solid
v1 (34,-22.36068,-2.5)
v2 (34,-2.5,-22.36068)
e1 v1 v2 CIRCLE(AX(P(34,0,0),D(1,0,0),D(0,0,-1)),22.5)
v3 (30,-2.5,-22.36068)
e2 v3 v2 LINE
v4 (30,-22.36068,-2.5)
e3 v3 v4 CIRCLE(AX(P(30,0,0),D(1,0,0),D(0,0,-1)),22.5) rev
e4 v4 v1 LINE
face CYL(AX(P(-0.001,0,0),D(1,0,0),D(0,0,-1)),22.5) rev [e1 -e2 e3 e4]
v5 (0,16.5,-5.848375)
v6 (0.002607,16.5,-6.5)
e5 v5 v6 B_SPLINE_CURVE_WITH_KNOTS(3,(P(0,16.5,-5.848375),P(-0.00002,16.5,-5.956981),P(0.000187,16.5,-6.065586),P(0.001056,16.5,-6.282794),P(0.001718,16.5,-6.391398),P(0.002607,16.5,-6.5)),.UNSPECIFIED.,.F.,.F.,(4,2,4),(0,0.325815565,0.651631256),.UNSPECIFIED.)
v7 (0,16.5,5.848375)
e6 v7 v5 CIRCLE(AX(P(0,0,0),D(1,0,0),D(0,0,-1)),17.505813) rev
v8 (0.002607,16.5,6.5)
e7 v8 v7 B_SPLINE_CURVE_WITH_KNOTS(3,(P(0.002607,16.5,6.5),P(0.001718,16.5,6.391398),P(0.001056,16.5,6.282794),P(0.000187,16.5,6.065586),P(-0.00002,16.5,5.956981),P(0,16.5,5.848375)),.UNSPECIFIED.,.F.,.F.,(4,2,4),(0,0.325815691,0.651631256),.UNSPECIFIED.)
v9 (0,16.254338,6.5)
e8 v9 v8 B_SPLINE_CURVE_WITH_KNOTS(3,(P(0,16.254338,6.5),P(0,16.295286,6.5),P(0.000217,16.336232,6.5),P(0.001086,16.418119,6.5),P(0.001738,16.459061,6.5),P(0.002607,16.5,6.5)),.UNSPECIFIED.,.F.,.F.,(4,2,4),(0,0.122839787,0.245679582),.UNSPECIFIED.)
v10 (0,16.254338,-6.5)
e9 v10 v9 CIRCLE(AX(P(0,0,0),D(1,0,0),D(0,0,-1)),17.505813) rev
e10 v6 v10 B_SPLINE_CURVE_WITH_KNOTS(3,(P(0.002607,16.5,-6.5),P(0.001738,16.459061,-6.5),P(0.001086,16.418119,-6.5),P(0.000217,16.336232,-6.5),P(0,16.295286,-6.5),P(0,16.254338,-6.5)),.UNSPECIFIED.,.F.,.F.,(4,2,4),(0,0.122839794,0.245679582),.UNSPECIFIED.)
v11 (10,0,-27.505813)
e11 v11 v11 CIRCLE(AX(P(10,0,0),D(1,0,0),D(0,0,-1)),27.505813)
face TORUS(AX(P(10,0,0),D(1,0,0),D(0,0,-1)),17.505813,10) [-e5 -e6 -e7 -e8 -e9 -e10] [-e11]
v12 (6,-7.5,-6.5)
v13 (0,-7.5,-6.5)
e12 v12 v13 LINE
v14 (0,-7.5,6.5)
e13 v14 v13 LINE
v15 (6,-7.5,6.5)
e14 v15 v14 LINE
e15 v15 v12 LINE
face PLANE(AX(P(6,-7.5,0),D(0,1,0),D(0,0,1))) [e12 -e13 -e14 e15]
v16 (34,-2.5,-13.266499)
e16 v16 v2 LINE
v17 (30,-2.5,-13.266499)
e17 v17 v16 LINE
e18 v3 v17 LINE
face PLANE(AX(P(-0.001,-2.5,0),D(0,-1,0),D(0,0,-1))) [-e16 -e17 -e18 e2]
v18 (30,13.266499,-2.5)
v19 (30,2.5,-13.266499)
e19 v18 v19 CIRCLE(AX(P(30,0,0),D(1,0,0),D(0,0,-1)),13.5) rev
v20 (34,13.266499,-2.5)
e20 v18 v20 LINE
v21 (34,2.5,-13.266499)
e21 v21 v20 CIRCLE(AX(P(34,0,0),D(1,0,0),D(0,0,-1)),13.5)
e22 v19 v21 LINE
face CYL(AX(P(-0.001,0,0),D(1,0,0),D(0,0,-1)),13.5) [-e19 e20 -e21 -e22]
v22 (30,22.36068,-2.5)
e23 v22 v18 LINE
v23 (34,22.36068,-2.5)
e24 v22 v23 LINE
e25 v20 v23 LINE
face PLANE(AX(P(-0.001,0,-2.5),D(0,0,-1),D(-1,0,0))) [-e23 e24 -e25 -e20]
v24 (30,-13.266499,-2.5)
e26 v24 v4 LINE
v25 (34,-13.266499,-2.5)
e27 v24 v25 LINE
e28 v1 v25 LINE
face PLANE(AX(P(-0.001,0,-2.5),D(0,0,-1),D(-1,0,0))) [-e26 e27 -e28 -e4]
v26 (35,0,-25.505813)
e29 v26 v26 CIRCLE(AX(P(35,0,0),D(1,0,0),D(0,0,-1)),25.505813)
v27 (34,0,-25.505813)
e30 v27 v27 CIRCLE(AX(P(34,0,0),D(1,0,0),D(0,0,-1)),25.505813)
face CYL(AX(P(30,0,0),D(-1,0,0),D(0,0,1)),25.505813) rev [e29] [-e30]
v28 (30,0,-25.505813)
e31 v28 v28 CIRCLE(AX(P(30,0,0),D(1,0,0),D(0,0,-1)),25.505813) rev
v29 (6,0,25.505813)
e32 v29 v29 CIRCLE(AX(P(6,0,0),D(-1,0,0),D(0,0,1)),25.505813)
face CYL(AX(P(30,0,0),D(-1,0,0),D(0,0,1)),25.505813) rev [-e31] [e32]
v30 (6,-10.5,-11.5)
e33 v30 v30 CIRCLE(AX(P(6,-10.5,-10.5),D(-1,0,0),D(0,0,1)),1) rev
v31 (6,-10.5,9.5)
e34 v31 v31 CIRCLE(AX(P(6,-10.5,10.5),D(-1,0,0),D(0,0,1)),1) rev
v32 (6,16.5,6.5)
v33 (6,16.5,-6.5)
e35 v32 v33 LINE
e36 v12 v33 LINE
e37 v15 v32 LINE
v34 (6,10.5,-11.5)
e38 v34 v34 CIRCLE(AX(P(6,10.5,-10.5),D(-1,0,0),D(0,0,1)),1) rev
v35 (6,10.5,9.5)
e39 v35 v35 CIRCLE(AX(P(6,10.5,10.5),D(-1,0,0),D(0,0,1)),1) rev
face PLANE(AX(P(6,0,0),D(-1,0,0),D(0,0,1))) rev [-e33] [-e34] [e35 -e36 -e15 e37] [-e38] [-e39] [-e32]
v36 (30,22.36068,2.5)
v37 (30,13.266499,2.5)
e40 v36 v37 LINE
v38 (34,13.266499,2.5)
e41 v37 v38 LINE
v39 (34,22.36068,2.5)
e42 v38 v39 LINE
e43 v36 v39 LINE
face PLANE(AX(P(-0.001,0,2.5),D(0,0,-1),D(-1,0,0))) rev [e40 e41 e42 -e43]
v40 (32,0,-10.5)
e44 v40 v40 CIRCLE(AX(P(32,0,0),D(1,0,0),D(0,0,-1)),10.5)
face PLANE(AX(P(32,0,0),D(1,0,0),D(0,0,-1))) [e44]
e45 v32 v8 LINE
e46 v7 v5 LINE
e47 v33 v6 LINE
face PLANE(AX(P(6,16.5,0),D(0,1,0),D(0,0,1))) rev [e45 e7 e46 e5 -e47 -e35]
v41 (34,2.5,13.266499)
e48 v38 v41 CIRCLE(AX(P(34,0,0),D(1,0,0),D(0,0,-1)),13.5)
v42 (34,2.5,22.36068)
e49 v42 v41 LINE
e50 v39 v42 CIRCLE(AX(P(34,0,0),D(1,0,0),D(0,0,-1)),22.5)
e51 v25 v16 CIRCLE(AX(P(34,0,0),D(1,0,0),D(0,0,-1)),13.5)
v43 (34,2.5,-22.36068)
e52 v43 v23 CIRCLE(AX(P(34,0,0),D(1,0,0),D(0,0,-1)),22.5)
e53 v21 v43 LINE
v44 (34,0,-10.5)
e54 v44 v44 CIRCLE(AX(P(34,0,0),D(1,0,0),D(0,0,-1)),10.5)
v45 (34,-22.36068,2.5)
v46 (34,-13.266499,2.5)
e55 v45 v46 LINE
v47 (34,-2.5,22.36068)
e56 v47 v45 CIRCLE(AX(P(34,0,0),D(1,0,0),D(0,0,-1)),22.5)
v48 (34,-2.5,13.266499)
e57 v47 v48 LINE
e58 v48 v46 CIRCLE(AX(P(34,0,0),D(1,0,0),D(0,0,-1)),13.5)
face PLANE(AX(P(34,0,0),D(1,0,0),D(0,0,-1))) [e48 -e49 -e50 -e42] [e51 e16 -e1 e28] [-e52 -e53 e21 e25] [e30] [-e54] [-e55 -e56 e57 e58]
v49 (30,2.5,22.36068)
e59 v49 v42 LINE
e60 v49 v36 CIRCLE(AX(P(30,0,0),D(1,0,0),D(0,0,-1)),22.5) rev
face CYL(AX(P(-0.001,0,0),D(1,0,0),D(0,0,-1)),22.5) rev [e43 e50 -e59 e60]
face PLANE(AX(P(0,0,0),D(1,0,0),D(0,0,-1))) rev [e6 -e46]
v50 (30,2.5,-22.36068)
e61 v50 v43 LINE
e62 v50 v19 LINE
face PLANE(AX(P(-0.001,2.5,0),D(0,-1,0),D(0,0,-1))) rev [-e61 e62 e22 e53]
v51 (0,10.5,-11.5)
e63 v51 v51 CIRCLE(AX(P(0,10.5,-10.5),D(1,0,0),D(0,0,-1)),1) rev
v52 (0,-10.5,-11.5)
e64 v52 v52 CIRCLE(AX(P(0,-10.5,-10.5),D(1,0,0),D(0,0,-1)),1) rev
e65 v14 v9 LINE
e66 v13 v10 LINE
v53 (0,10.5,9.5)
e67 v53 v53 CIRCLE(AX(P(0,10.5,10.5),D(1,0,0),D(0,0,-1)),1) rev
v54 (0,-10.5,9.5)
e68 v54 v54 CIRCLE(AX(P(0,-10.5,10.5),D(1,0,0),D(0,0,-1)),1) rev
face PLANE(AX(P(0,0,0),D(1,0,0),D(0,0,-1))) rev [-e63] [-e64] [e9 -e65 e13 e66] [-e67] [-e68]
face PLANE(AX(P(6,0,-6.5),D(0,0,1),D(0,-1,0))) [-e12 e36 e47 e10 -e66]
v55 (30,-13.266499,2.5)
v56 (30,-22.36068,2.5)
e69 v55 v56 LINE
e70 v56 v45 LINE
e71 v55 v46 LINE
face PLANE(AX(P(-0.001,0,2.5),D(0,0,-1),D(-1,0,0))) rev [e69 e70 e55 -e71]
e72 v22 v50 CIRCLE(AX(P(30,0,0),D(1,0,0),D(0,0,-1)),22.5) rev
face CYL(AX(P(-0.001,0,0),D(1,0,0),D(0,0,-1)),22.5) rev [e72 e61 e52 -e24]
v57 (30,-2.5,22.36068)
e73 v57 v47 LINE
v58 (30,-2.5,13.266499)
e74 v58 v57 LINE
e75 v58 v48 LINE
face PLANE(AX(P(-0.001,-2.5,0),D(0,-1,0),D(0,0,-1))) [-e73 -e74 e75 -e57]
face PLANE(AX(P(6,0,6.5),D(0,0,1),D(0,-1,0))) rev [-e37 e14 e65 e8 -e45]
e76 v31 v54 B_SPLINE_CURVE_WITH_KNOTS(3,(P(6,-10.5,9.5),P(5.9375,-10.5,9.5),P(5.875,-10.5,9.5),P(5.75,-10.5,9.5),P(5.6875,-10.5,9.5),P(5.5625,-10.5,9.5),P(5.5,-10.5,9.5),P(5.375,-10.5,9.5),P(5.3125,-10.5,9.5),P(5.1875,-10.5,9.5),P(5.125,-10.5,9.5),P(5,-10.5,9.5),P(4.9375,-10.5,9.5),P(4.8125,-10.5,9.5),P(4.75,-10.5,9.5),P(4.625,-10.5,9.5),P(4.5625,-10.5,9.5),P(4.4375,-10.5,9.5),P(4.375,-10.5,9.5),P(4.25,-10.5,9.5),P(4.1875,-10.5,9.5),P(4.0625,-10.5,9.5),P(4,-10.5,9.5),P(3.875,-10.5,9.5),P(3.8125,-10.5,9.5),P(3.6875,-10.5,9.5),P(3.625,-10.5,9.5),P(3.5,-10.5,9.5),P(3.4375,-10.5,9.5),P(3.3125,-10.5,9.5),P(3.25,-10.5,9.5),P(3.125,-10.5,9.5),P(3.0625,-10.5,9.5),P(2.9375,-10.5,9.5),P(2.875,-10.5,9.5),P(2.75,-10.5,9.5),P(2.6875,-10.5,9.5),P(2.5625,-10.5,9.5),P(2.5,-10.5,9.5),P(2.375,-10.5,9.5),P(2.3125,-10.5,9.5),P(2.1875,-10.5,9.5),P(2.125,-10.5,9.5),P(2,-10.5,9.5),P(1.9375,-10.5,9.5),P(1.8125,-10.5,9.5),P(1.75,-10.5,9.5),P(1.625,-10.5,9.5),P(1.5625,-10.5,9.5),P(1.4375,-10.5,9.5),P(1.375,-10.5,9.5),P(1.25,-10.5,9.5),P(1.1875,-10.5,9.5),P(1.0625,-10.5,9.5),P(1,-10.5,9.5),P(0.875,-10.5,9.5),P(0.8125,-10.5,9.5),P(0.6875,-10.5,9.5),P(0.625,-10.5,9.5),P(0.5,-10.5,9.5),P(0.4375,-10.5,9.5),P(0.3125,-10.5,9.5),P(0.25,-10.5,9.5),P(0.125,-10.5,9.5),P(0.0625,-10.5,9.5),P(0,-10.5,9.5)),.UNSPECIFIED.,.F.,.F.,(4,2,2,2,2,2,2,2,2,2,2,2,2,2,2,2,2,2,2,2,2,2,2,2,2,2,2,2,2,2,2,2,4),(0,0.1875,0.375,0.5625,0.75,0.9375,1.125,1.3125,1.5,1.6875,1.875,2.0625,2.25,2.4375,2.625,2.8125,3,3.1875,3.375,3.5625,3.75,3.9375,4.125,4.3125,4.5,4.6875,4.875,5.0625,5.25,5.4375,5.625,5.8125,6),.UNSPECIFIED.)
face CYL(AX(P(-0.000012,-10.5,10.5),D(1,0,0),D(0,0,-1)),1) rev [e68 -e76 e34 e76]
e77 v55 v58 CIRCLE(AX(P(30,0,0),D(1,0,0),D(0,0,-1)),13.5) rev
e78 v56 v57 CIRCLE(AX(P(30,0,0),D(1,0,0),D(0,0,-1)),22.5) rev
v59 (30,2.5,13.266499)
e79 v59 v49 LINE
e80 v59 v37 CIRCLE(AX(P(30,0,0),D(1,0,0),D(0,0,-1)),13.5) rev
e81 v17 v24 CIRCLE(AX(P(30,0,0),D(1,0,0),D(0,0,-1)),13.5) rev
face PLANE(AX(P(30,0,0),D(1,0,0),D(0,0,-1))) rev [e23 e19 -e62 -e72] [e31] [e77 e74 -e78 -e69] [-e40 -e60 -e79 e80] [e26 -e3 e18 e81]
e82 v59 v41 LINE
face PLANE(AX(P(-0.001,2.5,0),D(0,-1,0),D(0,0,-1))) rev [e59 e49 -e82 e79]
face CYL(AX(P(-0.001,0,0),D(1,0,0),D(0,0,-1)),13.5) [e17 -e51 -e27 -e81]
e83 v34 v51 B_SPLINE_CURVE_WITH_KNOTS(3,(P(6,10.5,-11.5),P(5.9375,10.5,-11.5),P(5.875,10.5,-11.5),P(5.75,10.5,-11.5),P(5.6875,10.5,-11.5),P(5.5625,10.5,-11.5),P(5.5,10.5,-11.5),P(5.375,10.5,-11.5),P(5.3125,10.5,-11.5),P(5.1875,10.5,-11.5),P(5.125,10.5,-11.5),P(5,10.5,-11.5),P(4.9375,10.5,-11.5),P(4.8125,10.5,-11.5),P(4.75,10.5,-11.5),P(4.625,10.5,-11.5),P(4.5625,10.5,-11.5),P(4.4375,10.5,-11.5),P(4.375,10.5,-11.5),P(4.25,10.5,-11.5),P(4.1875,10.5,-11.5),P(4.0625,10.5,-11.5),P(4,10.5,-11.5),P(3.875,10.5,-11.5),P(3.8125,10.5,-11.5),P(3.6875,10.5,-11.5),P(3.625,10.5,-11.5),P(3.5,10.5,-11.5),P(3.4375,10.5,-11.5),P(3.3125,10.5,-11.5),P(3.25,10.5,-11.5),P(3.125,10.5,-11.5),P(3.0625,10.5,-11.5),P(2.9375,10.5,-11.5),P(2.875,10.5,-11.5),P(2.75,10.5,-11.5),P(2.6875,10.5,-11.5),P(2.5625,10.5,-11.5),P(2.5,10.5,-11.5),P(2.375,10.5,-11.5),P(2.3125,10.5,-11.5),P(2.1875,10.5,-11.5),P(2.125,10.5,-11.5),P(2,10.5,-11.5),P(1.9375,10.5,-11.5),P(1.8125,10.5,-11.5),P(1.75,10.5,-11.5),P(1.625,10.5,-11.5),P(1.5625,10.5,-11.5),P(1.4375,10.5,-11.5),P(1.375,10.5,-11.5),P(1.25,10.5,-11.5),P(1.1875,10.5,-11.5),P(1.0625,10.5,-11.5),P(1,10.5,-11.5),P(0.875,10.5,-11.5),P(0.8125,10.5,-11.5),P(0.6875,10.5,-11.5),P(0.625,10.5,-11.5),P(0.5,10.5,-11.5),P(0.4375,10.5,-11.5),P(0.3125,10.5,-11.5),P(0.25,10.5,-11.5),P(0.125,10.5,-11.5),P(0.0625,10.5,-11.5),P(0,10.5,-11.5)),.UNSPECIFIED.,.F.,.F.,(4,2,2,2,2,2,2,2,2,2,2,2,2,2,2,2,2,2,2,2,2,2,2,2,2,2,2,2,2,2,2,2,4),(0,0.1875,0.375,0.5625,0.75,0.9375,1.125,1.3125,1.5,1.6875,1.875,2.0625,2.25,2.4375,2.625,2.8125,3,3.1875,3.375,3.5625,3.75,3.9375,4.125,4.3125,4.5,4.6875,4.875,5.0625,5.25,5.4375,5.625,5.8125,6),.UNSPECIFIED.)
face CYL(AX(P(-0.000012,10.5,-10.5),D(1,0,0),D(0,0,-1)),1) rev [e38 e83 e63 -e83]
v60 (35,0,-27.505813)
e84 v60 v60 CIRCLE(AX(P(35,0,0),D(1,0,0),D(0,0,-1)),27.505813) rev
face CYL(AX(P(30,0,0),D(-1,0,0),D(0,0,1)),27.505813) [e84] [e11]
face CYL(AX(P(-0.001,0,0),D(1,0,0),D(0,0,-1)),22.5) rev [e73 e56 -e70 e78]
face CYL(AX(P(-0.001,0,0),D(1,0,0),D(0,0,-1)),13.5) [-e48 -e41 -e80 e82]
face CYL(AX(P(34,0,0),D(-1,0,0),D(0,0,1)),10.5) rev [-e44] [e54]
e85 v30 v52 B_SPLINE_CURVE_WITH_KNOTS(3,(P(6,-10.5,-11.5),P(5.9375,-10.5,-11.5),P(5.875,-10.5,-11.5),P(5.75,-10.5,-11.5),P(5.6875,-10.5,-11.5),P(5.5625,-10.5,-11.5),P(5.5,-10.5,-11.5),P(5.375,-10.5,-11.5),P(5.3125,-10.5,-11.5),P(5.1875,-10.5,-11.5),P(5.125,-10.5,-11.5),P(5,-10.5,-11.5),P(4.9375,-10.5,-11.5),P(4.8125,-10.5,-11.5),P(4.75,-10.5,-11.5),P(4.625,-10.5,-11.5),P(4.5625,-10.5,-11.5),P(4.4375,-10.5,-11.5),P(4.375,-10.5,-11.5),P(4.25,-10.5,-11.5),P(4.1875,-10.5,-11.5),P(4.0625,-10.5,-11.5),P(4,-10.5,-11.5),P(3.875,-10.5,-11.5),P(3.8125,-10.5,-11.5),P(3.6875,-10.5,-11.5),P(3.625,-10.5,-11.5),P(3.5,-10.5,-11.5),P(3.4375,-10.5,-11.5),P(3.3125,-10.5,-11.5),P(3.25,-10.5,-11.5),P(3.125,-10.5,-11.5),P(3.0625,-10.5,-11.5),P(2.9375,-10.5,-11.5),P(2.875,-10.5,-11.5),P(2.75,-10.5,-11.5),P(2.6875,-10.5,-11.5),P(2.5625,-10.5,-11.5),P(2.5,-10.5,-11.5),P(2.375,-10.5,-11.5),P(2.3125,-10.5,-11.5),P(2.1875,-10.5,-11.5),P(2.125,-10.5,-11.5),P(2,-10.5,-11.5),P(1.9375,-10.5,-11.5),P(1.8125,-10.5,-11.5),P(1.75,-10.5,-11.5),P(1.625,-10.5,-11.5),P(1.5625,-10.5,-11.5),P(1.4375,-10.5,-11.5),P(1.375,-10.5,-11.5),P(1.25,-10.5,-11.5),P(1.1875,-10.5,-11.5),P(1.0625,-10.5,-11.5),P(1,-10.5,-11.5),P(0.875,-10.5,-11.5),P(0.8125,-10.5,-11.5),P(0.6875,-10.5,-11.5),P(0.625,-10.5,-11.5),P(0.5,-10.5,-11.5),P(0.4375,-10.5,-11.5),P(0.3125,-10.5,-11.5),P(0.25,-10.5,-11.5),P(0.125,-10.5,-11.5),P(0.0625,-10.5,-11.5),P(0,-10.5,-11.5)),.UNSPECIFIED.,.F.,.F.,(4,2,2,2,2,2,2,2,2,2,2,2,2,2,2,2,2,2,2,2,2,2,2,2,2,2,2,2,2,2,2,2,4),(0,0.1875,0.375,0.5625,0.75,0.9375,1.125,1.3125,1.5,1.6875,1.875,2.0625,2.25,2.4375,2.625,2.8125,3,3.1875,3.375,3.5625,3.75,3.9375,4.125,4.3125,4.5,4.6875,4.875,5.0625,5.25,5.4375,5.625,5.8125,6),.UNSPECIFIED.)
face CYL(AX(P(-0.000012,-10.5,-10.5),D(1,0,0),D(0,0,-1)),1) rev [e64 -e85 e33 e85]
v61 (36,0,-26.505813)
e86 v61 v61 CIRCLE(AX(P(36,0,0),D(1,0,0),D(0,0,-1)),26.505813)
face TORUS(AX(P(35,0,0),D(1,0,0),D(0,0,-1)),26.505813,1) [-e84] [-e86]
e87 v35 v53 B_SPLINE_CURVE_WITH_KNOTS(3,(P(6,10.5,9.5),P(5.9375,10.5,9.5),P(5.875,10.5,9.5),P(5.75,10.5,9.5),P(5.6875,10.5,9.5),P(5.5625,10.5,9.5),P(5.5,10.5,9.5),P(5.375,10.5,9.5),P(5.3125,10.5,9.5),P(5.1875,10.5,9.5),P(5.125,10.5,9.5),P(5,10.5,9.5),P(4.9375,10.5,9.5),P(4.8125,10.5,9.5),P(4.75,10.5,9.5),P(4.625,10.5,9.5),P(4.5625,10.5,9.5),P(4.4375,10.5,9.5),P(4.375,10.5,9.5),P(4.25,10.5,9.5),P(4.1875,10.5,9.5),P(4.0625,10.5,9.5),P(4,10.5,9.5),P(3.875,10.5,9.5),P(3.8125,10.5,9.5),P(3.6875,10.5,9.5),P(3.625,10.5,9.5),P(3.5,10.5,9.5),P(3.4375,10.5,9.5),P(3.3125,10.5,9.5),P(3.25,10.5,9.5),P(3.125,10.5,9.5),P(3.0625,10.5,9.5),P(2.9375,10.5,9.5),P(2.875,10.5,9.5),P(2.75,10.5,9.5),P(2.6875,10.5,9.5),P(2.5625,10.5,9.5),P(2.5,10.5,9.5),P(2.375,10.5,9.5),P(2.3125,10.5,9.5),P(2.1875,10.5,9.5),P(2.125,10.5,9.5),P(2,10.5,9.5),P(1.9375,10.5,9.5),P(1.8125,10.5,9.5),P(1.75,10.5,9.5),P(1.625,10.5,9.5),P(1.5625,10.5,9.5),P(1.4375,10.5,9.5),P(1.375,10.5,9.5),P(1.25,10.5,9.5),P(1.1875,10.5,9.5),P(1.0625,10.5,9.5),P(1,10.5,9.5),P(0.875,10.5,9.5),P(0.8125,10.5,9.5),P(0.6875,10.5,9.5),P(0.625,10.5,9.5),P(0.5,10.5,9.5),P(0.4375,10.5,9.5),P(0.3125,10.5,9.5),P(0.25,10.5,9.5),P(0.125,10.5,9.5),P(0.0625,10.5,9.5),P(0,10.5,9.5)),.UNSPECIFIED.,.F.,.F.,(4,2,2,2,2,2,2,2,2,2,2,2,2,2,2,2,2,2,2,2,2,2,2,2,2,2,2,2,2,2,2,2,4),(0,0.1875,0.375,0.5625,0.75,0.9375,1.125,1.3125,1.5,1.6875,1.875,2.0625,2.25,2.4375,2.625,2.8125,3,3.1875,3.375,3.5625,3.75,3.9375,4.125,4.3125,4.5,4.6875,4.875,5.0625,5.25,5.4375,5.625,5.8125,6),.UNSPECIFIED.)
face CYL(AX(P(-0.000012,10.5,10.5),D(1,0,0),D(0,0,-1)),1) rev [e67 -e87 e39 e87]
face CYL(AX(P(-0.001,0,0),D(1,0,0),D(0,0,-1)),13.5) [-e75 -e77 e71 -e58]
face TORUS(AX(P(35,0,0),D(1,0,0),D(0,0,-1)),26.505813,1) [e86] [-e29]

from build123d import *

# Parameters (mm, degrees)
SKETCH1_R                      = 27.505813168
SKETCH1_R_2                    = 25.505813168
BOSS_EXTRUDE1_DEPTH            = 30
SKETCH2_R                      = 27.505813168
SKETCH2_R_2                    = 25.505813168
BOSS_EXTRUDE4_DEPTH            = 6
SKETCH2_4_R                    = 25.505813168
SKETCH2_4_R_2                  = 10.5
BOSS_EXTRUDE5_DEPTH            = 4
SKETCH2_5_R                    = 10.5
BOSS_EXTRUDE6_DEPTH            = 2
SKETCH3_R                      = 27.505813168
SKETCH3_R_2                    = 25.505813168
SKETCH3_R_3                    = 21.505813168
SKETCH3_W                      = 4
SKETCH3_H                      = 13
BOSS_EXTRUDE8_DEPTH            = 6
CUT_EXTRUDE3_REACH             = 53.664
CUT_EXTRUDE4_REACH             = 55.001
SKETCH9_R                      = 1
CUT_EXTRUDE4_DIRECTION_2_DEPTH = 54.001316173
FILLET9_R                      = 10
FILLET10_R                     = 1


# Some blends are built 0.0001 mm under size
with BuildPart() as part:
    # Sketch1 → Boss-Extrude1 (new body)
    with BuildSketch(Plane.YZ):
        with Locations(Location((0, 0, 0), (0, 0, 270))):
            Circle(SKETCH1_R)
        with Locations(Location((0, 0, 0), (0, 0, 270))):
            Circle(SKETCH1_R_2, mode=Mode.SUBTRACT)
    extrude(amount=BOSS_EXTRUDE1_DEPTH)

    # Sketch2 → Boss-Extrude4 (add)
    with BuildSketch(Plane.YZ.offset(30)):
        with Locations(Location((0, 0, 0), (0, 0, 270))):
            Circle(SKETCH2_R)
        with Locations(Location((0, 0, 0), (0, 0, 270))):
            Circle(SKETCH2_R_2, mode=Mode.SUBTRACT)
    extrude(amount=BOSS_EXTRUDE4_DEPTH)

    # Sketch2<4> → Boss-Extrude5 (add)
    with BuildSketch(Plane.YZ.offset(30)):
        with Locations(Location((0, 0, 0), (0, 0, 270))):
            Circle(SKETCH2_4_R)
        with Locations(Location((0, 0, 0), (0, 0, 270))):
            Circle(SKETCH2_4_R_2, mode=Mode.SUBTRACT)
    extrude(amount=BOSS_EXTRUDE5_DEPTH)

    # Sketch2<5> → Boss-Extrude6 (add)
    with BuildSketch(Plane.YZ.offset(30)):
        with Locations(Location((0, 0, 0), (0, 0, 270))):
            Circle(SKETCH2_5_R)
    extrude(amount=BOSS_EXTRUDE6_DEPTH)

    # Sketch3 → Boss-Extrude8 (add)
    # profile 1 of 6: a face of its own
    with BuildSketch(Plane(origin=(0, 0, 0), x_dir=(0, -1, 0), z_dir=(-1, 0, 0))):
        with Locations(Location((0, 0, 0), (0, 0, 270))):
            Circle(SKETCH3_R)
        with Locations(Location((0, 0, 0), (0, 0, 270))):
            Circle(SKETCH3_R_2, mode=Mode.SUBTRACT)
    # profile 2 of 6: a face of its own
    with BuildSketch(Plane(origin=(0, 0, 0), x_dir=(0, -1, 0), z_dir=(-1, 0, 0))):
        with Locations(Location((0, 0, 0), (0, 0, 270))):
            Circle(SKETCH3_R_2)
        Circle(SKETCH3_R_3, mode=Mode.SUBTRACT)
    # profile 3 of 6: a face of its own
    with BuildSketch(Plane(origin=(0, 0, 0), x_dir=(0, -1, 0), z_dir=(-1, 0, 0))):
        with BuildLine():
            ThreePointArc((12.5, 0), (3.375390485, 12.035644523), (-10.677078252, 6.5))
            Line((-10.677078252, 6.5), (0, 6.5))
            Line((0, 6.5), (7.5, 6.5))
            Line((7.5, 6.5), (7.5, -6.5))
            Line((7.5, -6.5), (0, -6.5))
            Line((0, -6.5), (-10.677078252, -6.5))
            ThreePointArc((-10.677078252, -6.5), (3.375390485, -12.035644523), (12.5, 0))
        make_face()
    # profile 4 of 6: a face of its own
    with BuildSketch(Plane(origin=(0, 0, 0), x_dir=(0, -1, 0), z_dir=(-1, 0, 0))):
        with BuildLine():
            Line((-20.5, -6.5), (-20.5, 6.5))
            ThreePointArc((-20.5, 6.5), (-21.505813168, 0), (-20.5, -6.5))
        make_face()
    # profile 5 of 6: a face of its own
    with BuildSketch(Plane(origin=(0, 0, 0), x_dir=(0, -1, 0), z_dir=(-1, 0, 0))):
        with BuildLine():
            Line((-20.5, 6.5), (-16.5, 6.5))
            Line((-16.5, 6.5), (-10.677078252, 6.5))
            ThreePointArc((-10.677078252, 6.5), (3.375390485, 12.035644523), (12.5, 0))
            ThreePointArc((12.5, 0), (3.375390485, -12.035644523), (-10.677078252, -6.5))
            Line((-10.677078252, -6.5), (-16.5, -6.5))
            Line((-16.5, -6.5), (-20.5, -6.5))
            ThreePointArc((-20.5, -6.5), (3.288679831, -21.252872393), (21.505813168, 0))
            ThreePointArc((21.505813168, 0), (3.288679831, 21.252872393), (-20.5, 6.5))
        make_face()
    # profile 6 of 6: a face of its own
    with BuildSketch(Plane(origin=(0, 0, 0), x_dir=(0, -1, 0), z_dir=(-1, 0, 0))):
        with Locations((-18.5, 0)):
            Rectangle(SKETCH3_W, SKETCH3_H)
    extrude(amount=-BOSS_EXTRUDE8_DEPTH)

    # Sketch8 → Cut-Extrude3 (cut, up to next)
    with BuildSketch(Plane.YZ.offset(34), mode=Mode.PRIVATE) as cut_extrude3_sk1:
        with BuildLine():
            Line((-13.266499161, -2.5), (-22.360679775, -2.5))
            ThreePointArc((-22.360679775, -2.5), (-15.909902577, -15.909902577), (-2.5, -22.360679775))
            Line((-2.5, -22.360679775), (-2.5, -13.266499161))
            ThreePointArc((-2.5, -13.266499161), (-9.545941546, -9.545941546), (-13.266499161, -2.5))
        make_face()
    cut_extrude3_tool1 = extrude(cut_extrude3_sk1.sketch, amount=-CUT_EXTRUDE3_REACH, mode=Mode.PRIVATE) & part.part
    # Sketch8 → Cut-Extrude3 (cut, up to next)
    with BuildSketch(Plane.YZ.offset(34), mode=Mode.PRIVATE) as cut_extrude3_sk2:
        with BuildLine():
            Line((-2.5, 13.266499161), (-2.5, 22.360679775))
            ThreePointArc((-2.5, 22.360679775), (-15.909902577, 15.909902577), (-22.360679775, 2.5))
            Line((-22.360679775, 2.5), (-13.266499161, 2.5))
            ThreePointArc((-13.266499161, 2.5), (-9.545941546, 9.545941546), (-2.5, 13.266499161))
        make_face()
    cut_extrude3_tool2 = extrude(cut_extrude3_sk2.sketch, amount=-CUT_EXTRUDE3_REACH, mode=Mode.PRIVATE) & part.part
    # Sketch8 → Cut-Extrude3 (cut, up to next)
    with BuildSketch(Plane.YZ.offset(34), mode=Mode.PRIVATE) as cut_extrude3_sk3:
        with BuildLine():
            ThreePointArc((22.360679775, 2.5), (15.909902577, 15.909902577), (2.5, 22.360679775))
            Line((2.5, 22.360679775), (2.5, 13.266499161))
            ThreePointArc((2.5, 13.266499161), (9.545941546, 9.545941546), (13.266499161, 2.5))
            Line((13.266499161, 2.5), (22.360679775, 2.5))
        make_face()
    cut_extrude3_tool3 = extrude(cut_extrude3_sk3.sketch, amount=-CUT_EXTRUDE3_REACH, mode=Mode.PRIVATE) & part.part
    # Sketch8 → Cut-Extrude3 (cut, up to next)
    with BuildSketch(Plane.YZ.offset(34), mode=Mode.PRIVATE) as cut_extrude3_sk4:
        with BuildLine():
            ThreePointArc((2.5, -22.360679775), (15.909902577, -15.909902577), (22.360679775, -2.5))
            Line((22.360679775, -2.5), (13.266499161, -2.5))
            ThreePointArc((13.266499161, -2.5), (9.545941546, -9.545941546), (2.5, -13.266499161))
            Line((2.5, -13.266499161), (2.5, -22.360679775))
        make_face()
    cut_extrude3_tool4 = extrude(cut_extrude3_sk4.sketch, amount=-CUT_EXTRUDE3_REACH, mode=Mode.PRIVATE) & part.part
    add(cut_extrude3_tool1.solids().sort_by_distance((34, -12.15155, -12.15155))[0], mode=Mode.SUBTRACT)
    add(cut_extrude3_tool2.solids().sort_by_distance((34, -12.15155, 12.15155))[0], mode=Mode.SUBTRACT)
    add(cut_extrude3_tool3.solids().sort_by_distance((34, 12.15155, 12.15155))[0], mode=Mode.SUBTRACT)
    add(cut_extrude3_tool4.solids().sort_by_distance((34, 12.15155, -12.15155))[0], mode=Mode.SUBTRACT)

    # Sketch9 → Cut-Extrude4 (cut, up to next)
    with BuildSketch(Plane(origin=(0, 0, 0), x_dir=(0, -1, 0), z_dir=(-1, 0, 0)), mode=Mode.PRIVATE) as cut_extrude4_sk1:
        with Locations(Location((-10.5, 10.5, 0), (0, 0, 270))):
            Circle(SKETCH9_R)
    cut_extrude4_tool1 = extrude(cut_extrude4_sk1.sketch, amount=-CUT_EXTRUDE4_REACH, mode=Mode.PRIVATE) & part.part
    # Sketch9 → Cut-Extrude4 (cut, up to next)
    with BuildSketch(Plane(origin=(0, 0, 0), x_dir=(0, -1, 0), z_dir=(-1, 0, 0)), mode=Mode.PRIVATE) as cut_extrude4_sk2:
        with Locations(Location((10.5, 10.5, 0), (0, 0, 270))):
            Circle(SKETCH9_R)
    cut_extrude4_tool2 = extrude(cut_extrude4_sk2.sketch, amount=-CUT_EXTRUDE4_REACH, mode=Mode.PRIVATE) & part.part
    # Sketch9 → Cut-Extrude4 (cut, up to next)
    with BuildSketch(Plane(origin=(0, 0, 0), x_dir=(0, -1, 0), z_dir=(-1, 0, 0)), mode=Mode.PRIVATE) as cut_extrude4_sk3:
        with Locations(Location((10.5, -10.5, 0), (0, 0, 270))):
            Circle(SKETCH9_R)
    cut_extrude4_tool3 = extrude(cut_extrude4_sk3.sketch, amount=-CUT_EXTRUDE4_REACH, mode=Mode.PRIVATE) & part.part
    # Sketch9 → Cut-Extrude4 (cut, up to next)
    with BuildSketch(Plane(origin=(0, 0, 0), x_dir=(0, -1, 0), z_dir=(-1, 0, 0)), mode=Mode.PRIVATE) as cut_extrude4_sk4:
        with Locations(Location((-10.5, -10.5, 0), (0, 0, 270))):
            Circle(SKETCH9_R)
    cut_extrude4_tool4 = extrude(cut_extrude4_sk4.sketch, amount=-CUT_EXTRUDE4_REACH, mode=Mode.PRIVATE) & part.part
    add(cut_extrude4_tool1.solids().sort_by_distance((0, 10.5, 10.5))[0], mode=Mode.SUBTRACT)
    add(cut_extrude4_tool2.solids().sort_by_distance((0, -10.5, 10.5))[0], mode=Mode.SUBTRACT)
    add(cut_extrude4_tool3.solids().sort_by_distance((0, -10.5, -10.5))[0], mode=Mode.SUBTRACT)
    add(cut_extrude4_tool4.solids().sort_by_distance((0, 10.5, -10.5))[0], mode=Mode.SUBTRACT)

    # Sketch9 → Cut-Extrude4 direction 2 (cut)
    with BuildSketch(Plane(origin=(0, 0, 0), x_dir=(0, -1, 0), z_dir=(-1, 0, 0))):
        with Locations(Location((-10.5, 10.5, 0), (0, 0, 270))):
            Circle(SKETCH9_R)
        with Locations(Location((10.5, 10.5, 0), (0, 0, 270))):
            Circle(SKETCH9_R)
        with Locations(Location((10.5, -10.5, 0), (0, 0, 270))):
            Circle(SKETCH9_R)
        with Locations(Location((-10.5, -10.5, 0), (0, 0, 270))):
            Circle(SKETCH9_R)
    extrude(amount=CUT_EXTRUDE4_DIRECTION_2_DEPTH, mode=Mode.SUBTRACT)

    # Fillet9
    # the kernel refuses this fillet: 10 mm, written as the material it takes off along each edge
    with BuildSketch(Plane(origin=(0, 0, 0), x_dir=(0, 0, -1), z_dir=(0, -1, 0))) as fillet9_piece_1:
        with BuildLine():
            CenterArc((27.505813168 - FILLET9_R, FILLET9_R), FILLET9_R, 270, 90)
            Line((27.505813168 - FILLET9_R, 0), (27.505813168, 0))
            Line((27.505813168, 0), (27.505813168, FILLET9_R))
        make_face()
    revolve(axis=Axis((0, 0, 0), (1, 0, 0)), mode=Mode.SUBTRACT)

    # Fillet10
    fillet10_edges = [part.edges().sort_by_distance(p)[0] for p in [
        (36, 0, 27.505813168),
        (36, 0, 25.505813168),
    ]]
    fillet(fillet10_edges, radius=FILLET10_R - 0.0001)  # a hair under: the kernel refuses the full size


solid = part.part
